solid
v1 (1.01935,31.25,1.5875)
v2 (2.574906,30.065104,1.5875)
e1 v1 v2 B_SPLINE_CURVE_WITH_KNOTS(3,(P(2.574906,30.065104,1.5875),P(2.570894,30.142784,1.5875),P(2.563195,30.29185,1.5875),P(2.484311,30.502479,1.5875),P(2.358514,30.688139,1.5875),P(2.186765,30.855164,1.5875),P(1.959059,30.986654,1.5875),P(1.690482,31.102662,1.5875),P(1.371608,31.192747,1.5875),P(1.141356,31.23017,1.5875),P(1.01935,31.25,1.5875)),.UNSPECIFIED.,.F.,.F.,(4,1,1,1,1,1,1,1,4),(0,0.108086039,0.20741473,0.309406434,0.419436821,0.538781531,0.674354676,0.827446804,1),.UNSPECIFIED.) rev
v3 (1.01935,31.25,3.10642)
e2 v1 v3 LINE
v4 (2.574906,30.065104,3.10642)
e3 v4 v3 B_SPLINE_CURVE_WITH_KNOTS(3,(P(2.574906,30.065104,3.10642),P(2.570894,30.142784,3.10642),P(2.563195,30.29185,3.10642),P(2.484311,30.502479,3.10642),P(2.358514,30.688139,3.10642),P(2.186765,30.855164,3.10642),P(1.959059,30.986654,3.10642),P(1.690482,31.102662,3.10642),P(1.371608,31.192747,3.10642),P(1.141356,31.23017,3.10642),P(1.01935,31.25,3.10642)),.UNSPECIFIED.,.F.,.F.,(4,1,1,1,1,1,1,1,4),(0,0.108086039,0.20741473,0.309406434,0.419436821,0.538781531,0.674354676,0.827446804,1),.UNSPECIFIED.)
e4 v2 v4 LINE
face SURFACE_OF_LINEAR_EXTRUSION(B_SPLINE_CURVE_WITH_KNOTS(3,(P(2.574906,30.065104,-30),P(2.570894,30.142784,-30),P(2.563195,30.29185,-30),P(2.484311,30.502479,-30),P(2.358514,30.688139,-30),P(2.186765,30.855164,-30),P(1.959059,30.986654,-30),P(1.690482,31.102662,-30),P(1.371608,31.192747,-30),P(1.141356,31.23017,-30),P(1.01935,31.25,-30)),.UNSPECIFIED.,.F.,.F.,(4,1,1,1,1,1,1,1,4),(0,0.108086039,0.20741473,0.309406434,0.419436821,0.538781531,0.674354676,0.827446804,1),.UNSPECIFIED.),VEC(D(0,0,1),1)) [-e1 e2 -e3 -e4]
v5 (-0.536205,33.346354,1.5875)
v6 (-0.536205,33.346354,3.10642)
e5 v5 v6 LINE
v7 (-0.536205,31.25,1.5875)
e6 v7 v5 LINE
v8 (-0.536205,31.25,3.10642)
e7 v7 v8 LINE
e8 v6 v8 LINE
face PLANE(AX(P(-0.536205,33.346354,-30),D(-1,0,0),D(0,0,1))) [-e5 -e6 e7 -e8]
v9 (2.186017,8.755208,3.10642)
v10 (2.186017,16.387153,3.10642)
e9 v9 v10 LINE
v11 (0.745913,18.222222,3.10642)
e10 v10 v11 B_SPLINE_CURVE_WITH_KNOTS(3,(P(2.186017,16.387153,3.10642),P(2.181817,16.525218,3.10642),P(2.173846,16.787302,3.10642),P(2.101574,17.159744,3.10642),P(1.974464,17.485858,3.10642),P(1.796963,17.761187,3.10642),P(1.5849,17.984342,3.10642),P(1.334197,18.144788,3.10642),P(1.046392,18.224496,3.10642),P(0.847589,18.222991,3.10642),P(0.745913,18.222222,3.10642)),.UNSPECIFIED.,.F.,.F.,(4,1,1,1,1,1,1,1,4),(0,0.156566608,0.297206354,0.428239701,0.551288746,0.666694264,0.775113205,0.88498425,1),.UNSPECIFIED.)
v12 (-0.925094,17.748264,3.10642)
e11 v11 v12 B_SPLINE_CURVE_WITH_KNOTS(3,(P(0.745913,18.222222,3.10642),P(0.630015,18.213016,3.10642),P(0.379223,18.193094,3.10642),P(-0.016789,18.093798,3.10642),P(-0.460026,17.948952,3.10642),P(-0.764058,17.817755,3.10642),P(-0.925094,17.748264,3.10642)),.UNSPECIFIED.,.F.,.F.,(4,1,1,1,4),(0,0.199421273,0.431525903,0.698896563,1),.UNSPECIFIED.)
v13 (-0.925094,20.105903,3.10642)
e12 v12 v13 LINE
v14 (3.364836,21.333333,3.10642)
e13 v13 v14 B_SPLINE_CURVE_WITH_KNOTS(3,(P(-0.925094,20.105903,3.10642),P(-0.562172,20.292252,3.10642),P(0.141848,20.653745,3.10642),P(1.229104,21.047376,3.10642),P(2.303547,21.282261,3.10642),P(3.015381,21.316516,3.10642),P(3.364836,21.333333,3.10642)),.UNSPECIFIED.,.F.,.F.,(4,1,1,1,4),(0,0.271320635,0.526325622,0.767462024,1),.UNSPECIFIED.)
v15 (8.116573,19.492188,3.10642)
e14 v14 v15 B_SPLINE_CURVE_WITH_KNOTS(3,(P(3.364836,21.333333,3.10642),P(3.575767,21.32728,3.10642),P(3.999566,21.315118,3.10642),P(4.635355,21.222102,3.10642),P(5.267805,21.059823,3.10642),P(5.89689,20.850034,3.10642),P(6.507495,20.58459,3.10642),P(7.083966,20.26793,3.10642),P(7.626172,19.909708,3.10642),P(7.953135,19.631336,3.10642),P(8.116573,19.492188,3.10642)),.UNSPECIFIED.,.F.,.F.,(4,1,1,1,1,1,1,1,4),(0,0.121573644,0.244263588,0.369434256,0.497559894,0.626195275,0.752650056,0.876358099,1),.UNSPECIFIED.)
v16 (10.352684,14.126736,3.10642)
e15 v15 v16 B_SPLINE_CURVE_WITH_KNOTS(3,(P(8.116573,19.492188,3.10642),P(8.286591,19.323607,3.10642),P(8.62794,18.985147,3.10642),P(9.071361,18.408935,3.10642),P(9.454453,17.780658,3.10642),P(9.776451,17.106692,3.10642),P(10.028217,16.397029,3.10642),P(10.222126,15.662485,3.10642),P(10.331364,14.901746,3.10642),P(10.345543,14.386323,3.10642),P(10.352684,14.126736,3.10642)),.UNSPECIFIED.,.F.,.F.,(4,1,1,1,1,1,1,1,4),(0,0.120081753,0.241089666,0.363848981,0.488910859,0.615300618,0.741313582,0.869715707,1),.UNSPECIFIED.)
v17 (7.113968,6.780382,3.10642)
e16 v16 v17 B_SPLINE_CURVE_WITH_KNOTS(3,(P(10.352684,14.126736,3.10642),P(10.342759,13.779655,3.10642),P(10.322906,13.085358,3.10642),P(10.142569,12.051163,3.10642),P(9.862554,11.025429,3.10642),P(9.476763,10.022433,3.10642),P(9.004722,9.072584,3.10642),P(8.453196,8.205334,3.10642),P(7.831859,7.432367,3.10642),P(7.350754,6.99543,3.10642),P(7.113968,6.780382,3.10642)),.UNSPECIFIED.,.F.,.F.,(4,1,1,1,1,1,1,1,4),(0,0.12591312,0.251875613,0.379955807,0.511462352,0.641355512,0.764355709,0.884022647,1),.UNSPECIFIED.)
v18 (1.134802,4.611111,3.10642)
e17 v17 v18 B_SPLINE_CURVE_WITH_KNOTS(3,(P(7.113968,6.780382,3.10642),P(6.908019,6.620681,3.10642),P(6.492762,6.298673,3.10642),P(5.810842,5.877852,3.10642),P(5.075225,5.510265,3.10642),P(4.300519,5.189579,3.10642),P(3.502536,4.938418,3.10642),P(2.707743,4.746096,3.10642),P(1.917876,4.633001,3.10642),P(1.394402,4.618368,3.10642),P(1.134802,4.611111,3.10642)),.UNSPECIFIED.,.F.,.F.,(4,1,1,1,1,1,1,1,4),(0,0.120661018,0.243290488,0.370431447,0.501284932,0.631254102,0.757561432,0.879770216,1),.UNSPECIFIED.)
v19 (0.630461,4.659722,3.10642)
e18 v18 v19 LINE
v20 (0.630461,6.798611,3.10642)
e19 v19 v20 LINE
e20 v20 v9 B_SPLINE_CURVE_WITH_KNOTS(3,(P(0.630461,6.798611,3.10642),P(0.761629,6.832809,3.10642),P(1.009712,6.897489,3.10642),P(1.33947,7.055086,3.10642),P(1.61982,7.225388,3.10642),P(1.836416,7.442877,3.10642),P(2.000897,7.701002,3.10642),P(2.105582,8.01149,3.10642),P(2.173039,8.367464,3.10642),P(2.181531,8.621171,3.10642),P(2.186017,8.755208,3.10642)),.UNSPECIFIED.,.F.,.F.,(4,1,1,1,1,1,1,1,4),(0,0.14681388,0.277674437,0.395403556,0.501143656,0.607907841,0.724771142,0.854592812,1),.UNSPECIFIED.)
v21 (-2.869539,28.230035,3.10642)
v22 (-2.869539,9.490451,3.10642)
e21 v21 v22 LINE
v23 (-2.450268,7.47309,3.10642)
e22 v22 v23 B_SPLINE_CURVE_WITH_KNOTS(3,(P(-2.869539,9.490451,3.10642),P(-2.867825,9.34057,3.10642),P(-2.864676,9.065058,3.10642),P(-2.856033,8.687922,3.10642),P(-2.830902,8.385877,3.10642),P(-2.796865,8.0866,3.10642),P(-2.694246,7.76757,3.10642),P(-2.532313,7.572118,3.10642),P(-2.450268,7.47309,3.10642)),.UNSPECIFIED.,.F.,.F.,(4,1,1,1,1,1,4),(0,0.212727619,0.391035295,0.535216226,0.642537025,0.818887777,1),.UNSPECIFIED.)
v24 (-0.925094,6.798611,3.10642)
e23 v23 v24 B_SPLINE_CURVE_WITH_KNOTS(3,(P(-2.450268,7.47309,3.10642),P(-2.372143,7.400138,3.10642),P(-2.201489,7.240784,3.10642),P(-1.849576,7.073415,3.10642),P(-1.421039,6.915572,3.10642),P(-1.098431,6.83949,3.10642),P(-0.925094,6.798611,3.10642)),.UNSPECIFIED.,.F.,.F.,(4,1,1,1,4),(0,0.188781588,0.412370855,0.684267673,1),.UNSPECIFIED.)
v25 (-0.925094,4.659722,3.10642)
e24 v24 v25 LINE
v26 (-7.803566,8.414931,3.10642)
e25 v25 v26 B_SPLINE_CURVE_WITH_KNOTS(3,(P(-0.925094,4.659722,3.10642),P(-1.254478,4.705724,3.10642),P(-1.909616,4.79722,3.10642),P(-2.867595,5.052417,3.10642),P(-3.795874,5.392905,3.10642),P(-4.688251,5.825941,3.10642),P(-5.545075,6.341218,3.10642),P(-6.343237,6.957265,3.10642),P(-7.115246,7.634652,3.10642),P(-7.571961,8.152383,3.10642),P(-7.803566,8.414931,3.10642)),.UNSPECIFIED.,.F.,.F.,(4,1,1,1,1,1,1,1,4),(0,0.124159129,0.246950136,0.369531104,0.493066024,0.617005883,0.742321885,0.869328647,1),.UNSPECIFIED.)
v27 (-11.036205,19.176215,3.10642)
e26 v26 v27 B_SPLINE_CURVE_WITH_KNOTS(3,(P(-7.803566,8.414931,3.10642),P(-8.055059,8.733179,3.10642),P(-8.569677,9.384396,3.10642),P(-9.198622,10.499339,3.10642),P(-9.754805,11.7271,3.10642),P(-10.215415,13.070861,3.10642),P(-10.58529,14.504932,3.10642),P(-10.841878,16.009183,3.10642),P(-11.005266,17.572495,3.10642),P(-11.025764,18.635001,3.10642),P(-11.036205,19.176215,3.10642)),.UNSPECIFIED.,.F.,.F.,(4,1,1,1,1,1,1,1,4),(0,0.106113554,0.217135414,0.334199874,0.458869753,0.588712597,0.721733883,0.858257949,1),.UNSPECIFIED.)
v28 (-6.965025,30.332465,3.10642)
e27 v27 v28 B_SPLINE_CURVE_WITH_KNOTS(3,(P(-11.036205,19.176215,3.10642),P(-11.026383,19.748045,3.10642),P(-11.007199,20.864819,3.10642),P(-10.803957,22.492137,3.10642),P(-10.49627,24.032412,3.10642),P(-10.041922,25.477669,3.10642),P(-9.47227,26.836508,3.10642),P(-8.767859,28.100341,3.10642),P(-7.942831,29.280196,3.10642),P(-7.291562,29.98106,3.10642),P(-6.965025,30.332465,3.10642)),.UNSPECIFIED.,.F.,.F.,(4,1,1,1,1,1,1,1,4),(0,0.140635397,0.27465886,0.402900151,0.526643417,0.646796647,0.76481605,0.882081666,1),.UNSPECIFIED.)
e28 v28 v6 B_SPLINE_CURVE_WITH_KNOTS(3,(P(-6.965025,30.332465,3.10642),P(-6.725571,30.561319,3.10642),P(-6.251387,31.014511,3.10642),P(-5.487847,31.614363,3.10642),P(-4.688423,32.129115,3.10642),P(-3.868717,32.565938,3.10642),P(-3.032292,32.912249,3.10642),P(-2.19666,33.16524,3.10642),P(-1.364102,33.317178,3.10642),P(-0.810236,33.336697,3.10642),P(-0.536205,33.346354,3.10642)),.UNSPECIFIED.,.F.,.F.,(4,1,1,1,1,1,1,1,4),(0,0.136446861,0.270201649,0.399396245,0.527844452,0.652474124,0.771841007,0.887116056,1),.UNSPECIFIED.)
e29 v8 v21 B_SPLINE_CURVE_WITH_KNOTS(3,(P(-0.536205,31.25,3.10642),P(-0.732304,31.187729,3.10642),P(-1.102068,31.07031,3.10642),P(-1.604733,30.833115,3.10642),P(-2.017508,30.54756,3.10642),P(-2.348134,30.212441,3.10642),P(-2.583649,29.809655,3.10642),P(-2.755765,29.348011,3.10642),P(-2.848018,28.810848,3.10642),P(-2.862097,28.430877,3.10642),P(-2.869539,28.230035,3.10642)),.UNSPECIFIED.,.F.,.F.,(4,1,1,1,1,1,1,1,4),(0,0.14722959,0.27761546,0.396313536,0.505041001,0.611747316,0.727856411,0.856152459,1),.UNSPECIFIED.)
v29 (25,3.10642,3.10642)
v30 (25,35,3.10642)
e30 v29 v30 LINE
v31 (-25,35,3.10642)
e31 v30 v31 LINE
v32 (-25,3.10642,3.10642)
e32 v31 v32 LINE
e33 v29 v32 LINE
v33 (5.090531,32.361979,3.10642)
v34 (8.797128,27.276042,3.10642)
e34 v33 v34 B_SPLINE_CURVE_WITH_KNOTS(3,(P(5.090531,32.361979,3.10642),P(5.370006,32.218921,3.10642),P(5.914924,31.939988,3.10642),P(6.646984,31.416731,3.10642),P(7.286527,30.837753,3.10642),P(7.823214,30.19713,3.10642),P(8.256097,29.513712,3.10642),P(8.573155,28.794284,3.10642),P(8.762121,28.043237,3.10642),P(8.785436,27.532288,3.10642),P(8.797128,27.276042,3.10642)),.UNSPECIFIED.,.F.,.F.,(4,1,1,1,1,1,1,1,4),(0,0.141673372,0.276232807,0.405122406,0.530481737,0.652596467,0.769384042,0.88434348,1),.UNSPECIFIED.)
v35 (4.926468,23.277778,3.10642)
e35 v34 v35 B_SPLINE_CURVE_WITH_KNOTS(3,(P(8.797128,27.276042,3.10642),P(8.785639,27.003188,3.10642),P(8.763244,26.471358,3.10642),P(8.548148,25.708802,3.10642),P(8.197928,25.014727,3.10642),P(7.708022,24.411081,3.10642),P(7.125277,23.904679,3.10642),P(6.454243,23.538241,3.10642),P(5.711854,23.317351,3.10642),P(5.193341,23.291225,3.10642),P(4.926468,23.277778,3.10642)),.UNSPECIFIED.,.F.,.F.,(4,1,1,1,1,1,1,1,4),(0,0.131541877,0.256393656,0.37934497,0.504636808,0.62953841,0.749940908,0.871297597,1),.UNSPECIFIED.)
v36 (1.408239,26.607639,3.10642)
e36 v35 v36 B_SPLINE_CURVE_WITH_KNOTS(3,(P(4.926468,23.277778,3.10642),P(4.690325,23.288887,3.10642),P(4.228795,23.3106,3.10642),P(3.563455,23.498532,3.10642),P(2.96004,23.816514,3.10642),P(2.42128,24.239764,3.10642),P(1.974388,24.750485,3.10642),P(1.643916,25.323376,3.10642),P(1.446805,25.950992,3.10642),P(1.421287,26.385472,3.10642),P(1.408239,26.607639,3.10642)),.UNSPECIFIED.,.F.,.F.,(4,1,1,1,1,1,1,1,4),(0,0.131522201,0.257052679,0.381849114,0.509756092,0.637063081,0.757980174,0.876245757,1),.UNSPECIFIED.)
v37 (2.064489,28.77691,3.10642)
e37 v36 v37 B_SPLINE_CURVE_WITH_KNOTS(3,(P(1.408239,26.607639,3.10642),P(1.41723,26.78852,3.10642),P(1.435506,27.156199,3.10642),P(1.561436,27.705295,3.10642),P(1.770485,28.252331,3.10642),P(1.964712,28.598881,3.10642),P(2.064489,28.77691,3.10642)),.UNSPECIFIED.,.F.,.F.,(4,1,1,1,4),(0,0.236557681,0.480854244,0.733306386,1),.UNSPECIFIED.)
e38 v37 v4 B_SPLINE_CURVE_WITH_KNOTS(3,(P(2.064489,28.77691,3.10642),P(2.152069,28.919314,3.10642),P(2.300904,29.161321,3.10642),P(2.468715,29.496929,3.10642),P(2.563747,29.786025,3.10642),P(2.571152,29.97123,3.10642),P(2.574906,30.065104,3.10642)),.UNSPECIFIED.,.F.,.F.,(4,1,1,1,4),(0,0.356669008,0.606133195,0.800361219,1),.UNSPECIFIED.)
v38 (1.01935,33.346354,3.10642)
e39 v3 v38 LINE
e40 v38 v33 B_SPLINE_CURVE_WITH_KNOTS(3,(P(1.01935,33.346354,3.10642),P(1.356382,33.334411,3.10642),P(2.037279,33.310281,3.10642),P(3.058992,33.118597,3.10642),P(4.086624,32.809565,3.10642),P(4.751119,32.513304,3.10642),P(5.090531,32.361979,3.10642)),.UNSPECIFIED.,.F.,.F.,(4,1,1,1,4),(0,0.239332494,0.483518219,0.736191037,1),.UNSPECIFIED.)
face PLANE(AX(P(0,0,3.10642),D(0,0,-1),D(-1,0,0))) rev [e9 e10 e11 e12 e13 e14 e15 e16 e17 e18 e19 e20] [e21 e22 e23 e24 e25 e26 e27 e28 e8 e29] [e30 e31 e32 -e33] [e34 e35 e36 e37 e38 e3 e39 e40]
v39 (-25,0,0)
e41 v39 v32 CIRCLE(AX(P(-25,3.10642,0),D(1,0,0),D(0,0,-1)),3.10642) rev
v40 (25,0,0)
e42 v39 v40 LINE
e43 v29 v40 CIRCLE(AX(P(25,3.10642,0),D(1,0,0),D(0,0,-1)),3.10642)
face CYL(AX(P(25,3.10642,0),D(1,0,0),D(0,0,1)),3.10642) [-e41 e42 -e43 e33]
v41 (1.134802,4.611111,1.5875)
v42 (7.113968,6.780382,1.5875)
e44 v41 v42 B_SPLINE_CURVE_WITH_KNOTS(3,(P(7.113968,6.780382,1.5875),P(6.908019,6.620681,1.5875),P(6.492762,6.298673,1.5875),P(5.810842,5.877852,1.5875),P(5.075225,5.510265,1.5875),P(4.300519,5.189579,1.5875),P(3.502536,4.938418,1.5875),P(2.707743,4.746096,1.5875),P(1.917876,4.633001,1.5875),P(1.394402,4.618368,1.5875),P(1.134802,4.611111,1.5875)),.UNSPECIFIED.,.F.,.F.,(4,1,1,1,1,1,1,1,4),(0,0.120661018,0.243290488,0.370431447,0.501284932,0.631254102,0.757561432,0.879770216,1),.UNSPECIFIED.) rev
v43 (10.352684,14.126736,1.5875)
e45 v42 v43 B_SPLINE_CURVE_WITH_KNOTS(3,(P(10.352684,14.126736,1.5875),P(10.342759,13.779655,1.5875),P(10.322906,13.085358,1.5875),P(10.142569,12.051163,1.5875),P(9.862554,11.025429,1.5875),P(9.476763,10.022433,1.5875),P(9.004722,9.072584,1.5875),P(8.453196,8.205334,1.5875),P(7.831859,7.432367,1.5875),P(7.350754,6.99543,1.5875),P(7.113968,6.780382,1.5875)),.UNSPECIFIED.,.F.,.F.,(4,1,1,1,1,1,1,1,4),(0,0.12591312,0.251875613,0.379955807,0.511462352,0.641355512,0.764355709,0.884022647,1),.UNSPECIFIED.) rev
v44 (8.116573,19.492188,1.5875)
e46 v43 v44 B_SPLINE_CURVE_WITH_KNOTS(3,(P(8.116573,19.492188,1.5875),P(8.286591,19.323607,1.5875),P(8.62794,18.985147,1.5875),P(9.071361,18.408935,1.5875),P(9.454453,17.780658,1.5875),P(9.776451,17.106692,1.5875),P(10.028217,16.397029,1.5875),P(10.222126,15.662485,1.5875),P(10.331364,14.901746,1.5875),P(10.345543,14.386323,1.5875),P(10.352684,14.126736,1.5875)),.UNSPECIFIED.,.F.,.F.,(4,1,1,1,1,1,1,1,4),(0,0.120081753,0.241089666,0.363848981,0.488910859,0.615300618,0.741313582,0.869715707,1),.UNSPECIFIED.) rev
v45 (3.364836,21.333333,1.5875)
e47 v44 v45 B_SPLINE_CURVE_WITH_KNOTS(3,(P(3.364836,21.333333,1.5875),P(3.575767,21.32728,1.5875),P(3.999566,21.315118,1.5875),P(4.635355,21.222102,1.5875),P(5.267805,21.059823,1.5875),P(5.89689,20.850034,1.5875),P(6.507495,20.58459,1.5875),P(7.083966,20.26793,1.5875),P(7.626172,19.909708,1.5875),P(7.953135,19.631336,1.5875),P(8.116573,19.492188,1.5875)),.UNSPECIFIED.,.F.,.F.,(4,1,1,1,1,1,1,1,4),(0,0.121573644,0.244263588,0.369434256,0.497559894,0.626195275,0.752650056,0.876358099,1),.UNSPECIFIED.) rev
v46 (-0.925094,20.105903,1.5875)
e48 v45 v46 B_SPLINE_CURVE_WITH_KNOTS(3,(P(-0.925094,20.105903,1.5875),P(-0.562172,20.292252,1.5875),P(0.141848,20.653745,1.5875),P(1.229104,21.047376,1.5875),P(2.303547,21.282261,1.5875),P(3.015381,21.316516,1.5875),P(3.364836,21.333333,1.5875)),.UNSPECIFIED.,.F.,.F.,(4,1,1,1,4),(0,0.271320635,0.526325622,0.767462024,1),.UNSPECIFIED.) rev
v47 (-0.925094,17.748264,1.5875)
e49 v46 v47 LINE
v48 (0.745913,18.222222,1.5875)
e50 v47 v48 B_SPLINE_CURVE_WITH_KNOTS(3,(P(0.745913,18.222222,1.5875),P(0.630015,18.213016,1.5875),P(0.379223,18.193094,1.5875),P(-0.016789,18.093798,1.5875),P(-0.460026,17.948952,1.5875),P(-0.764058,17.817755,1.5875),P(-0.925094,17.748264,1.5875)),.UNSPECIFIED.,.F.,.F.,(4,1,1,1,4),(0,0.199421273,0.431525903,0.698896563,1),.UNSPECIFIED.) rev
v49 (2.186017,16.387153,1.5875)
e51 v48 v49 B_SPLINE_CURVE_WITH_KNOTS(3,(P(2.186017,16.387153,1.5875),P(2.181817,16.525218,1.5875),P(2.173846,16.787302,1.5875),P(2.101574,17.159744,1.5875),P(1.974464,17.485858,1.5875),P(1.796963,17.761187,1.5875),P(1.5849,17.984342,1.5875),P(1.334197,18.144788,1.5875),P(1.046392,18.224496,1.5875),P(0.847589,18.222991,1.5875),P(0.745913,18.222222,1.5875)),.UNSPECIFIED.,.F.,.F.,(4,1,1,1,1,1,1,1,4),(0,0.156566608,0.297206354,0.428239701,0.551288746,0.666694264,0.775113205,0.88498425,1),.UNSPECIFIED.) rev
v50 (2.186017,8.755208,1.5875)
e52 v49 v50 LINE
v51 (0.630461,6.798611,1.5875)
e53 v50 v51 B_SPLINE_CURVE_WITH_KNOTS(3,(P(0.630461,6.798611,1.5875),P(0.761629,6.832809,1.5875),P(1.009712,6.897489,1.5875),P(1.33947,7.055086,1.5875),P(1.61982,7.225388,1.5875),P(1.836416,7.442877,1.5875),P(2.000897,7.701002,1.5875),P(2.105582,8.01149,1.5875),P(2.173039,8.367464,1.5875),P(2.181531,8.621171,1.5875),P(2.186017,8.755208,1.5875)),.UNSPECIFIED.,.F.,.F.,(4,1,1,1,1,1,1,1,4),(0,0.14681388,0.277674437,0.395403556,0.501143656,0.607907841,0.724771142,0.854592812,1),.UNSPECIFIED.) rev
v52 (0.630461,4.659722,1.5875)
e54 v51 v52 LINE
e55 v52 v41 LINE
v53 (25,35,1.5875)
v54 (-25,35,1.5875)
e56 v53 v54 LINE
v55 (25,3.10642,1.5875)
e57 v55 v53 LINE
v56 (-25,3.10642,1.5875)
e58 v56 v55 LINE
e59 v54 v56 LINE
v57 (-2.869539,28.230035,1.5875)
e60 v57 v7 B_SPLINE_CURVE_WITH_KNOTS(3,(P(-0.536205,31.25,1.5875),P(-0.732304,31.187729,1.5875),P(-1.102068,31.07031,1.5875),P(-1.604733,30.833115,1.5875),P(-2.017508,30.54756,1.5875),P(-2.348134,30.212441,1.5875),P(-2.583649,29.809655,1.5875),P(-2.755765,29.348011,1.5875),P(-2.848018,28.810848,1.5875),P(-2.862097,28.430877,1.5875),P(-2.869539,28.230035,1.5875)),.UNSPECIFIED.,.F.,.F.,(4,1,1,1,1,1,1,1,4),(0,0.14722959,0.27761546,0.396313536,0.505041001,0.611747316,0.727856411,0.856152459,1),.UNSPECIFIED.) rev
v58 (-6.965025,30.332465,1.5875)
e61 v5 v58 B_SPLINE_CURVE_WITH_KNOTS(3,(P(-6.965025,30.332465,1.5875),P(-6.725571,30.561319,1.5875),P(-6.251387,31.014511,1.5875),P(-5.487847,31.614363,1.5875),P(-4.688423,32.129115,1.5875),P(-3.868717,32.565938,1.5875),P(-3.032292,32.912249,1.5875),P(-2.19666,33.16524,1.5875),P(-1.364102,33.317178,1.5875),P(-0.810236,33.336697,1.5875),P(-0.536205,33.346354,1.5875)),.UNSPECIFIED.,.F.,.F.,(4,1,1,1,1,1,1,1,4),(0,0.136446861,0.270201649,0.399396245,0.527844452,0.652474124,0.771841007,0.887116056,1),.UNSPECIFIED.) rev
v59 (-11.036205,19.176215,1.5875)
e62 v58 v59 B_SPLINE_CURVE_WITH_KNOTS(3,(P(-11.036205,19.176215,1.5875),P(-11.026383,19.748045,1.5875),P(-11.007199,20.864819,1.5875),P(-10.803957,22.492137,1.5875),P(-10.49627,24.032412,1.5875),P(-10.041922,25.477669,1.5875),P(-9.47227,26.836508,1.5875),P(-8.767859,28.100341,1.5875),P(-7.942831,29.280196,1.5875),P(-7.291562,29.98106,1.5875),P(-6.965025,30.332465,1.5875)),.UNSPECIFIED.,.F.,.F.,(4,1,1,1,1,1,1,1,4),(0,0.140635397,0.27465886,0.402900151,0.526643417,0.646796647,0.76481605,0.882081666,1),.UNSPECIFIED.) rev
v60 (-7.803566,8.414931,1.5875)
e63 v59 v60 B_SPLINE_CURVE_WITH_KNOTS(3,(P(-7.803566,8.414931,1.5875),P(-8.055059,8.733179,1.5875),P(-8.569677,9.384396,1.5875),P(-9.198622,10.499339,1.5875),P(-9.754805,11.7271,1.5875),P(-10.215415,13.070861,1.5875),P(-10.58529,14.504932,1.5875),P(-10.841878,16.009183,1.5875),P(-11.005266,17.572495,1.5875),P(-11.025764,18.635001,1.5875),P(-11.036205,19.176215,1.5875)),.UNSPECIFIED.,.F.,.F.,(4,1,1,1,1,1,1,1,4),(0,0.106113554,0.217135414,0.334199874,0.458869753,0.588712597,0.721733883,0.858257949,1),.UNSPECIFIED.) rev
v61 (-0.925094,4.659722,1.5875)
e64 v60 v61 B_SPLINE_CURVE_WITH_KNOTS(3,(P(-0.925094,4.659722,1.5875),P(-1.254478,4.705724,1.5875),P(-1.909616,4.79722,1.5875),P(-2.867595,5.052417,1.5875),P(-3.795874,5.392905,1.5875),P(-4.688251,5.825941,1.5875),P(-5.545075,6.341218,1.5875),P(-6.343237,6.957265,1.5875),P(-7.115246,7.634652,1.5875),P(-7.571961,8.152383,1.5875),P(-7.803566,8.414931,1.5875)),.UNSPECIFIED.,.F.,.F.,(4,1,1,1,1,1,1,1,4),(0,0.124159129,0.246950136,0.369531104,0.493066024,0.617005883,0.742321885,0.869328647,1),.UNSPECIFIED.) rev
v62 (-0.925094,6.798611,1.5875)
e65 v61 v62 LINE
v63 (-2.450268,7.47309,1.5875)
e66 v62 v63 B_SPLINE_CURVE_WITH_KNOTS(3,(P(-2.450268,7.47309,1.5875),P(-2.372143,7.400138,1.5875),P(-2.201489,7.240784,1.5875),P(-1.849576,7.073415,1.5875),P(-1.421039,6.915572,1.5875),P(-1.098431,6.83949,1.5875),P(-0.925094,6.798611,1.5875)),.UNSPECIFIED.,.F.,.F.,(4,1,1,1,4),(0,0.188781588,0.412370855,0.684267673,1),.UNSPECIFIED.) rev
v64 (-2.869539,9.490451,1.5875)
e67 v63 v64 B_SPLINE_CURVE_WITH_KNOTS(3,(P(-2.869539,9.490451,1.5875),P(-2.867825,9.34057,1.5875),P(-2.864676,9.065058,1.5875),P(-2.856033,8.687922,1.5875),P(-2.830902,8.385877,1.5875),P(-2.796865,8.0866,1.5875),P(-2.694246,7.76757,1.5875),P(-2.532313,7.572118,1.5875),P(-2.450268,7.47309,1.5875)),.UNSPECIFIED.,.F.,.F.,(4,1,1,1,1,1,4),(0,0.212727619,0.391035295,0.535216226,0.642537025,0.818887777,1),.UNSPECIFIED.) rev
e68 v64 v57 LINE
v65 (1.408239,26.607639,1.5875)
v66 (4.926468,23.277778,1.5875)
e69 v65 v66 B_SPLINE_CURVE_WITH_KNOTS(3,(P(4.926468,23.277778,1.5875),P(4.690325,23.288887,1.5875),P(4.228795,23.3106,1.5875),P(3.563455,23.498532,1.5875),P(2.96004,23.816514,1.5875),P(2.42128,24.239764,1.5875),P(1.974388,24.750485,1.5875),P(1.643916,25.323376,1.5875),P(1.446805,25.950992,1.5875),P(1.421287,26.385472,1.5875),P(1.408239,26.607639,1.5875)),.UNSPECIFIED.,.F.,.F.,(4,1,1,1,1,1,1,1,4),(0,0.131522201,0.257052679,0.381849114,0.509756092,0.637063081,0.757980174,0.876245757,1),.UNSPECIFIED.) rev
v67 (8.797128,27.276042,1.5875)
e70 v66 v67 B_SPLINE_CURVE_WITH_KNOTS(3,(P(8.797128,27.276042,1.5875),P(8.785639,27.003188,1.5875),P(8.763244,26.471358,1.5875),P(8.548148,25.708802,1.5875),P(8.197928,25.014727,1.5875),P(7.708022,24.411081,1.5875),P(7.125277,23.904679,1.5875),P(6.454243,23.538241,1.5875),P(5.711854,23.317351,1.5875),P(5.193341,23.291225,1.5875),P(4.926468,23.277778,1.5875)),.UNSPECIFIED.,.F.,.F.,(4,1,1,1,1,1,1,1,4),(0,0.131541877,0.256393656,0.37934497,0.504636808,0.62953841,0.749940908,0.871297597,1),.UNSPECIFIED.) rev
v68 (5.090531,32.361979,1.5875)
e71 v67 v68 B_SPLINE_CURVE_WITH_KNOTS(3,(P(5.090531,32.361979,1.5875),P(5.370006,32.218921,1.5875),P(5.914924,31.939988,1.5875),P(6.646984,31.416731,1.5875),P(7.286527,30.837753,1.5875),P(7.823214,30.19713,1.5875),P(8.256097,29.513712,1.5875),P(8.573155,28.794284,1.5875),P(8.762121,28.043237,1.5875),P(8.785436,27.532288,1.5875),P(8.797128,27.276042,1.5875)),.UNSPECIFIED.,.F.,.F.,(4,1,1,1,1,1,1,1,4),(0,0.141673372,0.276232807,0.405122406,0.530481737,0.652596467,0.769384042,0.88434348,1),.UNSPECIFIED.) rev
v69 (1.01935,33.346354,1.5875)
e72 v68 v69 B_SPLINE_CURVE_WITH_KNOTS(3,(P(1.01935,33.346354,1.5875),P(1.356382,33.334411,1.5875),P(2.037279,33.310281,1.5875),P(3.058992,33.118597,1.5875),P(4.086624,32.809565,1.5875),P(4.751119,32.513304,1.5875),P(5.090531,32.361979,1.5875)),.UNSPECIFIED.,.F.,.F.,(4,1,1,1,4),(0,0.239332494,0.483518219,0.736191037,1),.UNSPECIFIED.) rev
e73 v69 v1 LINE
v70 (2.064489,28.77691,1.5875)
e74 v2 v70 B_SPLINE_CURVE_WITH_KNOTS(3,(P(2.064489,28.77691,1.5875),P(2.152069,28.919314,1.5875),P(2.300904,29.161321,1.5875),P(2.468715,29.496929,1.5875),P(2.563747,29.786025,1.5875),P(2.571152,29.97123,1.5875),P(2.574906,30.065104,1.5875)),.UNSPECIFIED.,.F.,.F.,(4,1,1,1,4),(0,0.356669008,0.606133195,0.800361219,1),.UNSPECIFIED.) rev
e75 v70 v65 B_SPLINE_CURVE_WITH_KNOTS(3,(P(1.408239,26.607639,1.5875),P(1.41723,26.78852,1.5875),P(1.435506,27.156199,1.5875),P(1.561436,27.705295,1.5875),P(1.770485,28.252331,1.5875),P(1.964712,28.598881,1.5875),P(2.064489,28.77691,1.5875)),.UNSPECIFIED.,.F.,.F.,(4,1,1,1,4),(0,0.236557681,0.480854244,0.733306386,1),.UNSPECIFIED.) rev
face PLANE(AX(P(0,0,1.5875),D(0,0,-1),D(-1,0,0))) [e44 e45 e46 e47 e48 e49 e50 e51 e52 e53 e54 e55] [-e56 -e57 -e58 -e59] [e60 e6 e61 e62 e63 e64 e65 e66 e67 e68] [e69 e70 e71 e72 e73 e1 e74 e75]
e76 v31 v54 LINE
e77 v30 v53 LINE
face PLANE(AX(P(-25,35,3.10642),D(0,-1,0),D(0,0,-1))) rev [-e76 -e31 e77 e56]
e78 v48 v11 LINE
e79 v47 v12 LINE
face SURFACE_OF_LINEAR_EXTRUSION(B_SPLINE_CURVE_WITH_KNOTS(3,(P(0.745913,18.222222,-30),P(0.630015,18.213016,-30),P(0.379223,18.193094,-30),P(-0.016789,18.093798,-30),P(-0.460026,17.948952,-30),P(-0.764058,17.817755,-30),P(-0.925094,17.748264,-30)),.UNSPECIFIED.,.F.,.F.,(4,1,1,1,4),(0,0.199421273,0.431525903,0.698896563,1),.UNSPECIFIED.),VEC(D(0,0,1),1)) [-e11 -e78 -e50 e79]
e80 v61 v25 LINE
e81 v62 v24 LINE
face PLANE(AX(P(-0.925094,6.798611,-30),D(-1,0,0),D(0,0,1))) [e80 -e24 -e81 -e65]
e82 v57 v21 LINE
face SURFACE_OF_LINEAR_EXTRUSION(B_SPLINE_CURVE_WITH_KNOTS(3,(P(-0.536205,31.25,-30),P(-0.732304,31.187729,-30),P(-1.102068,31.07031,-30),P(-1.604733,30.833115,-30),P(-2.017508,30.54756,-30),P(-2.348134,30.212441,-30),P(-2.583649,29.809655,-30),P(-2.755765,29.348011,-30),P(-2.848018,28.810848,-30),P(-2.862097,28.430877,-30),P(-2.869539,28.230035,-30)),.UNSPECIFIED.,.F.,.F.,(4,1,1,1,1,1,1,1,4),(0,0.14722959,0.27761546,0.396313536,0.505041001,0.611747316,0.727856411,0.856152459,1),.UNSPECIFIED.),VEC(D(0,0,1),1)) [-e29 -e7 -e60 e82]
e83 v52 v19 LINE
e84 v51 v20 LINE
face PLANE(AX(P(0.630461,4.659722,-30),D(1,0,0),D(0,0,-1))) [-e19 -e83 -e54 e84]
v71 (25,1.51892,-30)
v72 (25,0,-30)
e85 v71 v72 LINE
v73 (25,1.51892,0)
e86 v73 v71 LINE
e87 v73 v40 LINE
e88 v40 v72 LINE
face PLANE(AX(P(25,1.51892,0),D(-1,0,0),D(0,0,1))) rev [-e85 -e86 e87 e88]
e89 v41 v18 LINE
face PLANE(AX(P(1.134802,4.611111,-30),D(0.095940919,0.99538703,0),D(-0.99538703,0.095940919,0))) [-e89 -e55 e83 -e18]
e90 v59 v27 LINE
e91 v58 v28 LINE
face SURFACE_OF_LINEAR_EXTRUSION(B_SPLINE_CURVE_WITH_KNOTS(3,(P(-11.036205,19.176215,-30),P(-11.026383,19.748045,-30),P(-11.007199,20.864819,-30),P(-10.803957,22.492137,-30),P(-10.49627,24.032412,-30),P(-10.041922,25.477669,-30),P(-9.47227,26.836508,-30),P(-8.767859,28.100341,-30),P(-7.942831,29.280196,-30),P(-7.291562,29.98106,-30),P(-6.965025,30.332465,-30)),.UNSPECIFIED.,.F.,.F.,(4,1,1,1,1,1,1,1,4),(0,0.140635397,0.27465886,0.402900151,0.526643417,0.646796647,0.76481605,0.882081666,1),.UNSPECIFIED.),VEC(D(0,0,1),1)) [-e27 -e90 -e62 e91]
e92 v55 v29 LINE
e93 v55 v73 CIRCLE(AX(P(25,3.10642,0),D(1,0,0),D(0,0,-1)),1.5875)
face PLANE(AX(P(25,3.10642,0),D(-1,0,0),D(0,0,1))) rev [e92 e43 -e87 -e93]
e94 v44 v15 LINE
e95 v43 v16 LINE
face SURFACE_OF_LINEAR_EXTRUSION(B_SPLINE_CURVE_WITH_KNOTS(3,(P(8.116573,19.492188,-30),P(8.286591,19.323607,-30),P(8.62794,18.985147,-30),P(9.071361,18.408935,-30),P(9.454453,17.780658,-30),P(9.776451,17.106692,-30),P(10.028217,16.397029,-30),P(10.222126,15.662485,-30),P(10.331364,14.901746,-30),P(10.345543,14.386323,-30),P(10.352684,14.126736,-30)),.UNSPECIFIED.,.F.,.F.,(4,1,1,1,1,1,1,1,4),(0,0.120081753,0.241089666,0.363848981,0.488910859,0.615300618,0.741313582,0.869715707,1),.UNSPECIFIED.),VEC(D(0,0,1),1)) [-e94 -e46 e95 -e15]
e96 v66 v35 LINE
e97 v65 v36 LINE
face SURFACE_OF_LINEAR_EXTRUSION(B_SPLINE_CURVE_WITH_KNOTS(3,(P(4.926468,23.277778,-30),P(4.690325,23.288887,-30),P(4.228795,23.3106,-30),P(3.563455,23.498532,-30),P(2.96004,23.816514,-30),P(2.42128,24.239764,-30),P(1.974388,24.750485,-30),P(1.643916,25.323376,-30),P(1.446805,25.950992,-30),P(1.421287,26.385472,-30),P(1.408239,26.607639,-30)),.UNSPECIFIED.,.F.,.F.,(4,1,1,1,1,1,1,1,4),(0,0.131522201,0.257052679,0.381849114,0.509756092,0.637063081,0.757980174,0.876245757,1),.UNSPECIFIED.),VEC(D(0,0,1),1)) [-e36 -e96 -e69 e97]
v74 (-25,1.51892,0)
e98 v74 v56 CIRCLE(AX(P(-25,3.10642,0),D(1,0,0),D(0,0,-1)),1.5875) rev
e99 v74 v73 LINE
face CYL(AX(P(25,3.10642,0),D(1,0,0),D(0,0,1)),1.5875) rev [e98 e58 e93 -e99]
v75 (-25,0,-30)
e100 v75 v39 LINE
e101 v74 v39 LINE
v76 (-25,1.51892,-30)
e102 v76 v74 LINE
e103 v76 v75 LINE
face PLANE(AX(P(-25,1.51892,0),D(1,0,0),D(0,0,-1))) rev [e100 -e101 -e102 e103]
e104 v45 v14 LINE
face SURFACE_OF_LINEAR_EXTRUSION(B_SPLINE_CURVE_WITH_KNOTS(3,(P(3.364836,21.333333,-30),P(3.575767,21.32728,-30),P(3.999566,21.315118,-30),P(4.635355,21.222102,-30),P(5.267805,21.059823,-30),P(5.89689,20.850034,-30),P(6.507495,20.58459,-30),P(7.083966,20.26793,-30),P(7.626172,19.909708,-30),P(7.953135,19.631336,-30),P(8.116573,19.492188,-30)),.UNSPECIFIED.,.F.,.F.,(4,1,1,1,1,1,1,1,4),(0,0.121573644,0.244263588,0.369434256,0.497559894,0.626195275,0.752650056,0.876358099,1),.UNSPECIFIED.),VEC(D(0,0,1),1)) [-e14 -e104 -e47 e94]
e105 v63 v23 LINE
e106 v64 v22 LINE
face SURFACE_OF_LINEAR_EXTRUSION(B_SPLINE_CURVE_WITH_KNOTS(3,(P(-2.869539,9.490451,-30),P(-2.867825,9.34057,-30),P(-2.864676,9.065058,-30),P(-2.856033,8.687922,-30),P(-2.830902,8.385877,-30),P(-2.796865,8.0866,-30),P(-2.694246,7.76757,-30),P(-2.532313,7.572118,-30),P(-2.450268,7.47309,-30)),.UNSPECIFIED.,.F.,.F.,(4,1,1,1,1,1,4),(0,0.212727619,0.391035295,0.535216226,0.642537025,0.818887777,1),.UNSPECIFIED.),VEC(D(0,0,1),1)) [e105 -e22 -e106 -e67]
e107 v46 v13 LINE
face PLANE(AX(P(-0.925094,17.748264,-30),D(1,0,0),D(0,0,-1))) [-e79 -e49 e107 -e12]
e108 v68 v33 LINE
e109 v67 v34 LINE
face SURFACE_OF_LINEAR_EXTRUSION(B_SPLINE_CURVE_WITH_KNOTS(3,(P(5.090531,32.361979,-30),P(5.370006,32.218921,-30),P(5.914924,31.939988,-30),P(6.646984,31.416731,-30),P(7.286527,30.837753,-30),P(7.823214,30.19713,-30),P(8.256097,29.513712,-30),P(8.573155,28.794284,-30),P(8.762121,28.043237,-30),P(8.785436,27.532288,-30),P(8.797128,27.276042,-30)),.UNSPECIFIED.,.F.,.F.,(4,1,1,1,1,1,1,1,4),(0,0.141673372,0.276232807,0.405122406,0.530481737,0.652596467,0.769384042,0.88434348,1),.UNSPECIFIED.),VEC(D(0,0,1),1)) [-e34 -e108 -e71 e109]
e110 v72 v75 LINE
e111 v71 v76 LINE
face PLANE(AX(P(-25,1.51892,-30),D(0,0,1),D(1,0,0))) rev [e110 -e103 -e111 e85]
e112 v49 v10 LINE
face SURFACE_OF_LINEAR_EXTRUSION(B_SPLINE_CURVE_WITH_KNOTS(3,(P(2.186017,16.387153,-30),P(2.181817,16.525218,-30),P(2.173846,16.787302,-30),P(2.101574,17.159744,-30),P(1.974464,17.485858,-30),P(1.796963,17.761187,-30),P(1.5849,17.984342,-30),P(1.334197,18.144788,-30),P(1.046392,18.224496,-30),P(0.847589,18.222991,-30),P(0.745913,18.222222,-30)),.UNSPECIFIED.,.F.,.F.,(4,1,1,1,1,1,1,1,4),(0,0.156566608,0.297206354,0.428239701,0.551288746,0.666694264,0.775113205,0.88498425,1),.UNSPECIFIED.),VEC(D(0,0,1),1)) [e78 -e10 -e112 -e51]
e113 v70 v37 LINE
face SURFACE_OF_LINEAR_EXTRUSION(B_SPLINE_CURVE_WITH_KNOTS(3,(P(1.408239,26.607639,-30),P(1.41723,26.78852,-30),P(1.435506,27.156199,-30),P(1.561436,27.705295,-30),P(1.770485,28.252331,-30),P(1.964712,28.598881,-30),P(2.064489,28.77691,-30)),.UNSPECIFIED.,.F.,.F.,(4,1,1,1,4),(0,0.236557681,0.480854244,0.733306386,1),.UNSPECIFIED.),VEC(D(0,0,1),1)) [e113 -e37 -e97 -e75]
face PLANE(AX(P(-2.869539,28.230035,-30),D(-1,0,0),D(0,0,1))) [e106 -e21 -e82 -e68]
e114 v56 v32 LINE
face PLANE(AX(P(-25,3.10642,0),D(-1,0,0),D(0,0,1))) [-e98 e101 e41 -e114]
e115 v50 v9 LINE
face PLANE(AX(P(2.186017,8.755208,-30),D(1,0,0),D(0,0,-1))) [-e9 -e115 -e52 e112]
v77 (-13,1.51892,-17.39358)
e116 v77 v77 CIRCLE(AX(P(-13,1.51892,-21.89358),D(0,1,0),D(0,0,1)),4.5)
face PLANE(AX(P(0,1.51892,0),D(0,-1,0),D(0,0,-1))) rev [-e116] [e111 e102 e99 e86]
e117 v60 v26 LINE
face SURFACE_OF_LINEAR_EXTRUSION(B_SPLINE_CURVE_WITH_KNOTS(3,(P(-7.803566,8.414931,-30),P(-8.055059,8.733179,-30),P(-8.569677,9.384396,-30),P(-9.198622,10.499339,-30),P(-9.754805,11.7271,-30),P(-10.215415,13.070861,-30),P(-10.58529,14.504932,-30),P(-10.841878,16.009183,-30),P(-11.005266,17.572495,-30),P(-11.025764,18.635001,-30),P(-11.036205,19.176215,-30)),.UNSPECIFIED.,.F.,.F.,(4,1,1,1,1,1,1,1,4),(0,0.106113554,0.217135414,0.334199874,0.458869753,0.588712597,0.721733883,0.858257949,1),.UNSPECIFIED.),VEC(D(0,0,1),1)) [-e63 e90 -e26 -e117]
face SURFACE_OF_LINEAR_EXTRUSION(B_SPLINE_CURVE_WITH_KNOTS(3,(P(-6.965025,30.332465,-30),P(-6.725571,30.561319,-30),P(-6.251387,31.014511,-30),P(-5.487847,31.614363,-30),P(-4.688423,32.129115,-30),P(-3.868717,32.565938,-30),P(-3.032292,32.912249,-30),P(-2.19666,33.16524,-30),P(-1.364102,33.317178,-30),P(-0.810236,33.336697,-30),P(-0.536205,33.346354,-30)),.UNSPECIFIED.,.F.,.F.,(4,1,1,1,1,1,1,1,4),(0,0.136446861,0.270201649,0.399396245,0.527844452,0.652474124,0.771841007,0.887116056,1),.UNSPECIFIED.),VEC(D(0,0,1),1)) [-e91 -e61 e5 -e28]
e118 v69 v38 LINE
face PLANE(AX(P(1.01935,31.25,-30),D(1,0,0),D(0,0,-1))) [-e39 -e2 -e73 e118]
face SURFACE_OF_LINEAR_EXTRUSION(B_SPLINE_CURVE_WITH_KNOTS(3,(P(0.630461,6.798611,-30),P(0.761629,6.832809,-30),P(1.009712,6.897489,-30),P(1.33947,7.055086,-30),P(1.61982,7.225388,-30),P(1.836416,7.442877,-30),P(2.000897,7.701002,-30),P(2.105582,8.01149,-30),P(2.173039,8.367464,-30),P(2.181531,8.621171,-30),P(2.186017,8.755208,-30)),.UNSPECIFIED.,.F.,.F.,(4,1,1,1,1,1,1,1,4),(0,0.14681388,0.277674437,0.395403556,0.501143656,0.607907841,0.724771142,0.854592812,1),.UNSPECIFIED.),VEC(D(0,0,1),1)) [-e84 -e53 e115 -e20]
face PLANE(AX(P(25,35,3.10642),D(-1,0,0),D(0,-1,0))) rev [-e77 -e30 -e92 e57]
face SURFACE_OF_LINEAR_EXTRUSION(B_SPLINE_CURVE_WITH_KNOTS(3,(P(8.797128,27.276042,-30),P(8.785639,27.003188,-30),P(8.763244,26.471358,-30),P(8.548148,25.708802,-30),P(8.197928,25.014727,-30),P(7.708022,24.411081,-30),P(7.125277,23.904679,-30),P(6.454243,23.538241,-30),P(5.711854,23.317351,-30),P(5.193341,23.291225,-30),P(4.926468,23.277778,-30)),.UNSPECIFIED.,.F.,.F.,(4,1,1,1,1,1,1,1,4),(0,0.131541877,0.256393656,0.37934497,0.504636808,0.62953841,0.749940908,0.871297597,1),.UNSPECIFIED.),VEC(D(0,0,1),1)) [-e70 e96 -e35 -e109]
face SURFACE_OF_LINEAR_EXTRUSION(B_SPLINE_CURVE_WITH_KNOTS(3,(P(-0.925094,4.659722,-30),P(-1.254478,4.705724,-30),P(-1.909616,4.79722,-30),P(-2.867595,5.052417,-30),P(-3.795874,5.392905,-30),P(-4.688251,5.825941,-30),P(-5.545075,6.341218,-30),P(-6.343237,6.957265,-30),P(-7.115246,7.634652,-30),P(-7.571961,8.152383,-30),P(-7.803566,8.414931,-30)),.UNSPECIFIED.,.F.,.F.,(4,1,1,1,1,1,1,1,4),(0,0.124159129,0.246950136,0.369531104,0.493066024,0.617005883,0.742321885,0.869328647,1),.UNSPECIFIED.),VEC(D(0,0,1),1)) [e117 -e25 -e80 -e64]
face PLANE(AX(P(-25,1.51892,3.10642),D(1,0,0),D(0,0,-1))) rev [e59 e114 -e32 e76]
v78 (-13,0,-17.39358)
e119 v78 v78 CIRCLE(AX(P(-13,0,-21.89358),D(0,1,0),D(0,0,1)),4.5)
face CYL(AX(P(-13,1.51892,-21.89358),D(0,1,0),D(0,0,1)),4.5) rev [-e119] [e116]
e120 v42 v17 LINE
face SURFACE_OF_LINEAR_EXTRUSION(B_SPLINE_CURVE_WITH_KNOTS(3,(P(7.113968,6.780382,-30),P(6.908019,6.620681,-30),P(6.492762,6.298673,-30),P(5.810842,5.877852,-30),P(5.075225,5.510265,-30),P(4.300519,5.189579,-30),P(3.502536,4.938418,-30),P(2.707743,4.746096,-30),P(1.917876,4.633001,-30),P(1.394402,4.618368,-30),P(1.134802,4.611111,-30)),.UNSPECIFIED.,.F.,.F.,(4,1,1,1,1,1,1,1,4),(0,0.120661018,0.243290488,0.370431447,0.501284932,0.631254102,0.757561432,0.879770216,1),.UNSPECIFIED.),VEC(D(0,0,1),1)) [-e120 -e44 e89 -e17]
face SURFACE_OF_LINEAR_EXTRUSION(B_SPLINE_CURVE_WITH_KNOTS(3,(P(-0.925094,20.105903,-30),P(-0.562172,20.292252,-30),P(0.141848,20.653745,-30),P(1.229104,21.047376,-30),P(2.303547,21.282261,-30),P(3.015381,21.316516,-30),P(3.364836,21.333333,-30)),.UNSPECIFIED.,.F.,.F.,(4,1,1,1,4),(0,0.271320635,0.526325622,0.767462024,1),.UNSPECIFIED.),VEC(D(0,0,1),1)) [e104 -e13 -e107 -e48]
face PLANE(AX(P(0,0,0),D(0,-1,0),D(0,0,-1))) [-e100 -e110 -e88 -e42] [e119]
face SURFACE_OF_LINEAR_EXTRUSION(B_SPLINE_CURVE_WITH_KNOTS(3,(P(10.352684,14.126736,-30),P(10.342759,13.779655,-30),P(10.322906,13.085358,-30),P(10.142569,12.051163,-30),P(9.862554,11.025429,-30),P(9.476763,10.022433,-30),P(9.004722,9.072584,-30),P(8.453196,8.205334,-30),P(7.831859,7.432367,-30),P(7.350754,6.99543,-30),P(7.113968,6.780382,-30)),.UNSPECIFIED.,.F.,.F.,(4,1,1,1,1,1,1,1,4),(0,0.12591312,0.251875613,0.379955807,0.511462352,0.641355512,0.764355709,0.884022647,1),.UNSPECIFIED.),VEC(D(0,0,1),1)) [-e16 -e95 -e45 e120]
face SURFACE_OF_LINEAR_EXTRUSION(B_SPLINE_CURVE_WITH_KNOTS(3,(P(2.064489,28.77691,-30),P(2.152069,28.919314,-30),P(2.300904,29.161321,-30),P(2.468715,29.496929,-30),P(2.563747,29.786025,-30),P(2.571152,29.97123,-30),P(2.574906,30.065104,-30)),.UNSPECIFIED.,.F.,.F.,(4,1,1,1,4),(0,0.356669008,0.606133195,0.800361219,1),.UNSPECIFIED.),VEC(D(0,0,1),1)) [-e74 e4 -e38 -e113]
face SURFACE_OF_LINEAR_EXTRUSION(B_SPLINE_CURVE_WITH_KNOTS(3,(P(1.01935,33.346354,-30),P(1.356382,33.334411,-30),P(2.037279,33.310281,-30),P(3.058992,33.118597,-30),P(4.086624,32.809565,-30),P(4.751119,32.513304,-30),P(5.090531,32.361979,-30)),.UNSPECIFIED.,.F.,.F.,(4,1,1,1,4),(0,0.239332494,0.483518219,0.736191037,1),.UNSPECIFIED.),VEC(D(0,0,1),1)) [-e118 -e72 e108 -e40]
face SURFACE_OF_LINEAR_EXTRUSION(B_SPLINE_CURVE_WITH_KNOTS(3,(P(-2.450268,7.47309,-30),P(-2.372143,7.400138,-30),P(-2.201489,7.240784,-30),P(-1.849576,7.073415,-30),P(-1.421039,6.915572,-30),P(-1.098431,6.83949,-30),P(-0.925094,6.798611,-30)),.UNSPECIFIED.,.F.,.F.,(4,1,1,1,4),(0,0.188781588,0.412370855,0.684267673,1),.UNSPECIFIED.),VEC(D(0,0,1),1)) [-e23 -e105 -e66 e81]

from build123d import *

# Parameters (mm, degrees)
SKETCH1_W            = 50
SKETCH1_H            = 30
BASE_FLANGE1_DEPTH   = 1.51892
EDGE_FLANGE1_DEPTH   = 50
M8_CLEARANCE_HOLE1_D = 9
CUT_EXTRUDE1_DEPTH   = 55.277389816


# Sheet-metal steps are written as plain solids
with BuildPart() as part:
    # Sketch1 → Base-Flange1 (new body)
    with BuildSketch(Plane(origin=(0, 0, 0), x_dir=(1, 0, 0), z_dir=(0, 1, 0))):
        with Locations((0, 15)):
            Rectangle(SKETCH1_W, SKETCH1_H)
    extrude(amount=BASE_FLANGE1_DEPTH)

    # Edge-Flange1 section (across the edge) → Edge-Flange1 (add)
    with BuildSketch(Plane(origin=(-25, 1.51892, 1.5875), x_dir=(0, 0, -1), z_dir=(1, 0, 0))):
        with BuildLine():
            Line((-1.51892, 1.5875), (-1.51892, 33.48108))
            Line((-1.51892, 33.48108), (0, 33.48108))
            Line((0, 33.48108), (0, 1.5875))
            ThreePointArc((0, 1.5875), (0.464967985, 0.464967985), (1.5875, 0))
            Line((1.5875, 0), (1.5875, -1.51892))
            ThreePointArc((1.5875, -1.51892), (-0.609070647, -0.609070647), (-1.51892, 1.5875))
        make_face()
    extrude(amount=EDGE_FLANGE1_DEPTH)

    # M8 Clearance Hole1 (through all)
    with Locations(Plane(origin=(0, 1.51892, 0), x_dir=(1, 0, 0), z_dir=(0, 1, 0))):
        with Locations((-13, 21.89358)):
            Hole(M8_CLEARANCE_HOLE1_D / 2)

    # Sketch11 → Cut-Extrude1 (cut, through all)
    with BuildSketch(Plane.XY.offset(3.10642)):
        with BuildLine():
            Line((-0.536205236, 33.346354167), (-0.536205236, 31.25))
            add(Edge.make_bspline(
                [(-0.536205236, 31.25), (-0.732304351, 31.187728797), (-1.102067969, 31.070310494), (-1.604733174, 30.833115296), (-2.017508244, 30.547560299), (-2.348134384, 30.212441135), (-2.583648684, 29.809655364), (-2.755765248, 29.34801065), (-2.848017529, 28.810847769), (-2.862096707, 28.430876813), (-2.869538569, 28.230034722)],
                knots=[0, 0, 0, 0, 1.177836724, 2.220923683, 3.170508287, 4.04032801, 4.893978525, 5.822851288, 6.849219673, 8, 8, 8, 8], degree=3))
            Line((-2.869538569, 28.230034722), (-2.869538569, 9.490451389))
            add(Edge.make_bspline(
                [(-2.869538569, 9.490451389), (-2.867825411, 9.340569917), (-2.864676289, 9.065058229), (-2.856032947, 8.687922323), (-2.830901599, 8.38587715), (-2.796864936, 8.086599995), (-2.694246063, 7.767569857), (-2.532312838, 7.572117956), (-2.450267736, 7.473090278)],
                knots=[0, 0, 0, 0, 1.276365713, 2.34621177, 3.211297358, 3.855222149, 4.913326661, 6, 6, 6, 6], degree=3))
            add(Edge.make_bspline(
                [(-2.450267736, 7.473090278), (-2.372143104, 7.400138444), (-2.201489167, 7.240783867), (-1.849576421, 7.073415225), (-1.421039194, 6.915571991), (-1.09843104, 6.839489909), (-0.925094125, 6.798611111)],
                knots=[0, 0, 0, 0, 0.755126351, 1.649483421, 2.737070691, 4, 4, 4, 4], degree=3))
            Line((-0.925094125, 6.798611111), (-0.925094125, 4.659722222))
            add(Edge.make_bspline(
                [(-0.925094125, 4.659722222), (-1.254477967, 4.70572391), (-1.909616136, 4.797220389), (-2.867595341, 5.052416526), (-3.795873677, 5.392904571), (-4.688251224, 5.825940849), (-5.545074878, 6.341217745), (-6.343237475, 6.957264962), (-7.115245839, 7.634651596), (-7.571961107, 8.152383248), (-7.803566347, 8.414930556)],
                knots=[0, 0, 0, 0, 0.993273036, 1.975601091, 2.956248835, 3.944528193, 4.936047062, 5.938575079, 6.95462918, 8, 8, 8, 8], degree=3))
            add(Edge.make_bspline(
                [(-7.803566347, 8.414930556), (-8.055058907, 8.733178871), (-8.569676873, 9.384396149), (-9.198622321, 10.4993388), (-9.754805445, 11.72710012), (-10.215414522, 13.070861325), (-10.585289747, 14.50493195), (-10.841878152, 16.009183271), (-11.005265617, 17.572495268), (-11.025763903, 18.635000654), (-11.036205236, 19.176215278)],
                knots=[0, 0, 0, 0, 0.848908429, 1.737083309, 2.673598995, 3.670958022, 4.709700774, 5.773871062, 6.866063596, 8, 8, 8, 8], degree=3))
            add(Edge.make_bspline(
                [(-11.036205236, 19.176215278), (-11.026382584, 19.748044697), (-11.00719909, 20.864819137), (-10.803957186, 22.492136825), (-10.496270468, 24.032412225), (-10.041921928, 25.477668954), (-9.472269882, 26.8365081), (-8.767858972, 28.100340729), (-7.942830537, 29.28019574), (-7.291562466, 29.981060383), (-6.96502468, 30.332465278)],
                knots=[0, 0, 0, 0, 1.125083173, 2.197270879, 3.223201206, 4.213147336, 5.174373174, 6.118528402, 7.056653326, 8, 8, 8, 8], degree=3))
            add(Edge.make_bspline(
                [(-6.96502468, 30.332465278), (-6.725570757, 30.561318773), (-6.251387297, 31.014510524), (-5.487846636, 31.614362799), (-4.688422822, 32.12911505), (-3.86871675, 32.565937556), (-3.032292491, 32.912249239), (-2.196660266, 33.165240479), (-1.364102414, 33.317178289), (-0.810236123, 33.33669706), (-0.536205236, 33.346354167)],
                knots=[0, 0, 0, 0, 1.091574889, 2.161613191, 3.195169959, 4.222755612, 5.219792993, 6.174728054, 7.096928445, 8, 8, 8, 8], degree=3))
        make_face()
        with BuildLine():
            Line((1.01935032, 31.25), (1.01935032, 33.346354167))
            add(Edge.make_bspline(
                [(1.01935032, 33.346354167), (1.35638191, 33.334410674), (2.037279483, 33.310281496), (3.058991771, 33.118596613), (4.086623836, 32.809565238), (4.751119346, 32.513303808), (5.090530875, 32.361979167)],
                knots=[0, 0, 0, 0, 0.957329974, 1.934072875, 2.94476415, 4, 4, 4, 4], degree=3))
            add(Edge.make_bspline(
                [(5.090530875, 32.361979167), (5.37000628, 32.21892083), (5.91492361, 31.939987638), (6.646983826, 31.416730734), (7.286526768, 30.837752524), (7.82321414, 30.197129791), (8.256096639, 29.513712062), (8.573154519, 28.794283899), (8.762120848, 28.043236683), (8.785435523, 27.532288153), (8.797128098, 27.276041667)],
                knots=[0, 0, 0, 0, 1.133386976, 2.209862454, 3.240979251, 4.243853893, 5.220771738, 6.155072333, 7.074747837, 8, 8, 8, 8], degree=3))
            add(Edge.make_bspline(
                [(8.797128098, 27.276041667), (8.785638647, 27.003188082), (8.763244087, 26.471357992), (8.548147846, 25.708802292), (8.197928052, 25.014727339), (7.708022484, 24.411080511), (7.125276809, 23.904679385), (6.45424304, 23.538240792), (5.711854464, 23.317351012), (5.193341007, 23.291224684), (4.926468375, 23.277777778)],
                knots=[0, 0, 0, 0, 1.052335015, 2.051149251, 3.034759759, 4.037094461, 5.036307284, 5.99952726, 6.970380773, 8, 8, 8, 8], degree=3))
            add(Edge.make_bspline(
                [(4.926468375, 23.277777778), (4.690324716, 23.288887346), (4.228795332, 23.310600367), (3.563454835, 23.498531551), (2.960039675, 23.816514126), (2.421279895, 24.239764216), (1.97438813, 24.750484649), (1.643916355, 25.323376327), (1.446805269, 25.950992233), (1.421287465, 26.385472211), (1.408239209, 26.607638889)],
                knots=[0, 0, 0, 0, 1.052177608, 2.056421433, 3.054792914, 4.078048738, 5.096504648, 6.06384139, 7.009966053, 8, 8, 8, 8], degree=3))
            add(Edge.make_bspline(
                [(1.408239209, 26.607638889), (1.417230139, 26.788519635), (1.435506133, 27.156198562), (1.561436361, 27.705294624), (1.770484915, 28.252331108), (1.964711734, 28.598881271), (2.064489209, 28.776909722)],
                knots=[0, 0, 0, 0, 0.946230724, 1.923416974, 2.933225545, 4, 4, 4, 4], degree=3))
            add(Edge.make_bspline(
                [(2.064489209, 28.776909722), (2.152068669, 28.919314407), (2.30090363, 29.161320873), (2.46871514, 29.496928508), (2.563747337, 29.786024985), (2.571152453, 29.971229688), (2.574905875, 30.065104167)],
                knots=[0, 0, 0, 0, 1.426676034, 2.424532782, 3.201444875, 4, 4, 4, 4], degree=3))
            add(Edge.make_bspline(
                [(2.574905875, 30.065104167), (2.57089384, 30.142783896), (2.563194833, 30.291849587), (2.484310793, 30.502479258), (2.358514484, 30.688139304), (2.186764713, 30.855164059), (1.959059048, 30.986654466), (1.690482224, 31.102662213), (1.371607963, 31.192747437), (1.141356267, 31.230170329), (1.01935032, 31.25)],
                knots=[0, 0, 0, 0, 0.864688311, 1.659317839, 2.475251474, 3.355494564, 4.310252246, 5.394837407, 6.619574429, 8, 8, 8, 8], degree=3))
        make_face()
        with BuildLine():
            Line((-0.925094125, 17.748263889), (-0.925094125, 20.105902778))
            add(Edge.make_bspline(
                [(-0.925094125, 20.105902778), (-0.562172057, 20.292252137), (0.141848053, 20.653744887), (1.229104149, 21.047376471), (2.303547114, 21.282260708), (3.015380537, 21.316516402), (3.364836431, 21.333333333)],
                knots=[0, 0, 0, 0, 1.085282539, 2.105302489, 3.069848097, 4, 4, 4, 4], degree=3))
            add(Edge.make_bspline(
                [(3.364836431, 21.333333333), (3.575767493, 21.32728003), (3.999566405, 21.315117842), (4.635355291, 21.222102337), (5.267804942, 21.05982284), (5.896889917, 20.850033552), (6.507494748, 20.584589713), (7.083966485, 20.267929702), (7.626171736, 19.909707688), (7.95313475, 19.631336083), (8.116572542, 19.4921875)],
                knots=[0, 0, 0, 0, 0.972589152, 1.954108701, 2.955474046, 3.980479148, 5.009562198, 6.021200449, 7.010864794, 8, 8, 8, 8], degree=3))
            add(Edge.make_bspline(
                [(8.116572542, 19.4921875), (8.286591287, 19.323607302), (8.627940088, 18.985146688), (9.071361238, 18.408935486), (9.454453028, 17.780658412), (9.776451155, 17.106691604), (10.028216962, 16.397029145), (10.222125832, 15.662485068), (10.331364306, 14.901746379), (10.345542817, 14.386322918), (10.352683653, 14.126736111)],
                knots=[0, 0, 0, 0, 0.960654025, 1.928717332, 2.91079185, 3.911286876, 4.922404946, 5.930508659, 6.95772566, 8, 8, 8, 8], degree=3))
            add(Edge.make_bspline(
                [(10.352683653, 14.126736111), (10.342759002, 13.779655432), (10.322905808, 13.085357977), (10.142569288, 12.051162813), (9.862554364, 11.02542886), (9.476763198, 10.022432767), (9.004721612, 9.072584195), (8.453195982, 8.205333864), (7.831858662, 7.432367139), (7.350754184, 6.995429904), (7.113968375, 6.780381944)],
                knots=[0, 0, 0, 0, 1.007304958, 2.015004901, 3.039646456, 4.091698815, 5.130844098, 6.114845671, 7.072181175, 8, 8, 8, 8], degree=3))
            add(Edge.make_bspline(
                [(7.113968375, 6.780381944), (6.90801948, 6.620680668), (6.492761858, 6.298672764), (5.810841905, 5.877851847), (5.075224903, 5.510264937), (4.300519423, 5.189578578), (3.502536323, 4.938418331), (2.707743298, 4.746095899), (1.917876024, 4.633000789), (1.394402127, 4.618367855), (1.134801709, 4.611111111)],
                knots=[0, 0, 0, 0, 0.965288144, 1.946323901, 2.963451572, 4.010279453, 5.050032815, 6.060491454, 7.038161726, 8, 8, 8, 8], degree=3))
            Line((1.134801709, 4.611111111), (0.630461431, 4.659722222))
            Line((0.630461431, 4.659722222), (0.630461431, 6.798611111))
            add(Edge.make_bspline(
                [(0.630461431, 6.798611111), (0.761629372, 6.832809064), (1.009712074, 6.897488897), (1.339469946, 7.055085592), (1.619820156, 7.225387633), (1.836416232, 7.442876654), (2.00089705, 7.701001552), (2.10558164, 8.011490131), (2.173038554, 8.367464004), (2.181530549, 8.621171288), (2.186016987, 8.755208333)],
                knots=[0, 0, 0, 0, 1.174511043, 2.221395497, 3.163228448, 4.009149245, 4.86326273, 5.798169132, 6.836742493, 8, 8, 8, 8], degree=3))
            Line((2.186016987, 8.755208333), (2.186016987, 16.387152778))
            add(Edge.make_bspline(
                [(2.186016987, 16.387152778), (2.181817499, 16.525217563), (2.17384572, 16.787302382), (2.101574404, 17.159744372), (1.974463868, 17.485857622), (1.796962527, 17.761186859), (1.584899926, 17.984342452), (1.334196604, 18.144788488), (1.046391899, 18.224495567), (0.847588512, 18.222991473), (0.74591282, 18.222222222)],
                knots=[0, 0, 0, 0, 1.252532866, 2.377650834, 3.425917608, 4.410309965, 5.333554112, 6.20090564, 7.079874001, 8, 8, 8, 8], degree=3))
            add(Edge.make_bspline(
                [(0.74591282, 18.222222222), (0.630014522, 18.213015719), (0.379223237, 18.193093849), (-0.016789147, 18.093798205), (-0.460026427, 17.948951586), (-0.764057901, 17.817754823), (-0.925094125, 17.748263889)],
                knots=[0, 0, 0, 0, 0.797685093, 1.726103611, 2.795586252, 4, 4, 4, 4], degree=3))
        make_face()
    extrude(amount=-CUT_EXTRUDE1_DEPTH, mode=Mode.SUBTRACT)


solid = part.part
